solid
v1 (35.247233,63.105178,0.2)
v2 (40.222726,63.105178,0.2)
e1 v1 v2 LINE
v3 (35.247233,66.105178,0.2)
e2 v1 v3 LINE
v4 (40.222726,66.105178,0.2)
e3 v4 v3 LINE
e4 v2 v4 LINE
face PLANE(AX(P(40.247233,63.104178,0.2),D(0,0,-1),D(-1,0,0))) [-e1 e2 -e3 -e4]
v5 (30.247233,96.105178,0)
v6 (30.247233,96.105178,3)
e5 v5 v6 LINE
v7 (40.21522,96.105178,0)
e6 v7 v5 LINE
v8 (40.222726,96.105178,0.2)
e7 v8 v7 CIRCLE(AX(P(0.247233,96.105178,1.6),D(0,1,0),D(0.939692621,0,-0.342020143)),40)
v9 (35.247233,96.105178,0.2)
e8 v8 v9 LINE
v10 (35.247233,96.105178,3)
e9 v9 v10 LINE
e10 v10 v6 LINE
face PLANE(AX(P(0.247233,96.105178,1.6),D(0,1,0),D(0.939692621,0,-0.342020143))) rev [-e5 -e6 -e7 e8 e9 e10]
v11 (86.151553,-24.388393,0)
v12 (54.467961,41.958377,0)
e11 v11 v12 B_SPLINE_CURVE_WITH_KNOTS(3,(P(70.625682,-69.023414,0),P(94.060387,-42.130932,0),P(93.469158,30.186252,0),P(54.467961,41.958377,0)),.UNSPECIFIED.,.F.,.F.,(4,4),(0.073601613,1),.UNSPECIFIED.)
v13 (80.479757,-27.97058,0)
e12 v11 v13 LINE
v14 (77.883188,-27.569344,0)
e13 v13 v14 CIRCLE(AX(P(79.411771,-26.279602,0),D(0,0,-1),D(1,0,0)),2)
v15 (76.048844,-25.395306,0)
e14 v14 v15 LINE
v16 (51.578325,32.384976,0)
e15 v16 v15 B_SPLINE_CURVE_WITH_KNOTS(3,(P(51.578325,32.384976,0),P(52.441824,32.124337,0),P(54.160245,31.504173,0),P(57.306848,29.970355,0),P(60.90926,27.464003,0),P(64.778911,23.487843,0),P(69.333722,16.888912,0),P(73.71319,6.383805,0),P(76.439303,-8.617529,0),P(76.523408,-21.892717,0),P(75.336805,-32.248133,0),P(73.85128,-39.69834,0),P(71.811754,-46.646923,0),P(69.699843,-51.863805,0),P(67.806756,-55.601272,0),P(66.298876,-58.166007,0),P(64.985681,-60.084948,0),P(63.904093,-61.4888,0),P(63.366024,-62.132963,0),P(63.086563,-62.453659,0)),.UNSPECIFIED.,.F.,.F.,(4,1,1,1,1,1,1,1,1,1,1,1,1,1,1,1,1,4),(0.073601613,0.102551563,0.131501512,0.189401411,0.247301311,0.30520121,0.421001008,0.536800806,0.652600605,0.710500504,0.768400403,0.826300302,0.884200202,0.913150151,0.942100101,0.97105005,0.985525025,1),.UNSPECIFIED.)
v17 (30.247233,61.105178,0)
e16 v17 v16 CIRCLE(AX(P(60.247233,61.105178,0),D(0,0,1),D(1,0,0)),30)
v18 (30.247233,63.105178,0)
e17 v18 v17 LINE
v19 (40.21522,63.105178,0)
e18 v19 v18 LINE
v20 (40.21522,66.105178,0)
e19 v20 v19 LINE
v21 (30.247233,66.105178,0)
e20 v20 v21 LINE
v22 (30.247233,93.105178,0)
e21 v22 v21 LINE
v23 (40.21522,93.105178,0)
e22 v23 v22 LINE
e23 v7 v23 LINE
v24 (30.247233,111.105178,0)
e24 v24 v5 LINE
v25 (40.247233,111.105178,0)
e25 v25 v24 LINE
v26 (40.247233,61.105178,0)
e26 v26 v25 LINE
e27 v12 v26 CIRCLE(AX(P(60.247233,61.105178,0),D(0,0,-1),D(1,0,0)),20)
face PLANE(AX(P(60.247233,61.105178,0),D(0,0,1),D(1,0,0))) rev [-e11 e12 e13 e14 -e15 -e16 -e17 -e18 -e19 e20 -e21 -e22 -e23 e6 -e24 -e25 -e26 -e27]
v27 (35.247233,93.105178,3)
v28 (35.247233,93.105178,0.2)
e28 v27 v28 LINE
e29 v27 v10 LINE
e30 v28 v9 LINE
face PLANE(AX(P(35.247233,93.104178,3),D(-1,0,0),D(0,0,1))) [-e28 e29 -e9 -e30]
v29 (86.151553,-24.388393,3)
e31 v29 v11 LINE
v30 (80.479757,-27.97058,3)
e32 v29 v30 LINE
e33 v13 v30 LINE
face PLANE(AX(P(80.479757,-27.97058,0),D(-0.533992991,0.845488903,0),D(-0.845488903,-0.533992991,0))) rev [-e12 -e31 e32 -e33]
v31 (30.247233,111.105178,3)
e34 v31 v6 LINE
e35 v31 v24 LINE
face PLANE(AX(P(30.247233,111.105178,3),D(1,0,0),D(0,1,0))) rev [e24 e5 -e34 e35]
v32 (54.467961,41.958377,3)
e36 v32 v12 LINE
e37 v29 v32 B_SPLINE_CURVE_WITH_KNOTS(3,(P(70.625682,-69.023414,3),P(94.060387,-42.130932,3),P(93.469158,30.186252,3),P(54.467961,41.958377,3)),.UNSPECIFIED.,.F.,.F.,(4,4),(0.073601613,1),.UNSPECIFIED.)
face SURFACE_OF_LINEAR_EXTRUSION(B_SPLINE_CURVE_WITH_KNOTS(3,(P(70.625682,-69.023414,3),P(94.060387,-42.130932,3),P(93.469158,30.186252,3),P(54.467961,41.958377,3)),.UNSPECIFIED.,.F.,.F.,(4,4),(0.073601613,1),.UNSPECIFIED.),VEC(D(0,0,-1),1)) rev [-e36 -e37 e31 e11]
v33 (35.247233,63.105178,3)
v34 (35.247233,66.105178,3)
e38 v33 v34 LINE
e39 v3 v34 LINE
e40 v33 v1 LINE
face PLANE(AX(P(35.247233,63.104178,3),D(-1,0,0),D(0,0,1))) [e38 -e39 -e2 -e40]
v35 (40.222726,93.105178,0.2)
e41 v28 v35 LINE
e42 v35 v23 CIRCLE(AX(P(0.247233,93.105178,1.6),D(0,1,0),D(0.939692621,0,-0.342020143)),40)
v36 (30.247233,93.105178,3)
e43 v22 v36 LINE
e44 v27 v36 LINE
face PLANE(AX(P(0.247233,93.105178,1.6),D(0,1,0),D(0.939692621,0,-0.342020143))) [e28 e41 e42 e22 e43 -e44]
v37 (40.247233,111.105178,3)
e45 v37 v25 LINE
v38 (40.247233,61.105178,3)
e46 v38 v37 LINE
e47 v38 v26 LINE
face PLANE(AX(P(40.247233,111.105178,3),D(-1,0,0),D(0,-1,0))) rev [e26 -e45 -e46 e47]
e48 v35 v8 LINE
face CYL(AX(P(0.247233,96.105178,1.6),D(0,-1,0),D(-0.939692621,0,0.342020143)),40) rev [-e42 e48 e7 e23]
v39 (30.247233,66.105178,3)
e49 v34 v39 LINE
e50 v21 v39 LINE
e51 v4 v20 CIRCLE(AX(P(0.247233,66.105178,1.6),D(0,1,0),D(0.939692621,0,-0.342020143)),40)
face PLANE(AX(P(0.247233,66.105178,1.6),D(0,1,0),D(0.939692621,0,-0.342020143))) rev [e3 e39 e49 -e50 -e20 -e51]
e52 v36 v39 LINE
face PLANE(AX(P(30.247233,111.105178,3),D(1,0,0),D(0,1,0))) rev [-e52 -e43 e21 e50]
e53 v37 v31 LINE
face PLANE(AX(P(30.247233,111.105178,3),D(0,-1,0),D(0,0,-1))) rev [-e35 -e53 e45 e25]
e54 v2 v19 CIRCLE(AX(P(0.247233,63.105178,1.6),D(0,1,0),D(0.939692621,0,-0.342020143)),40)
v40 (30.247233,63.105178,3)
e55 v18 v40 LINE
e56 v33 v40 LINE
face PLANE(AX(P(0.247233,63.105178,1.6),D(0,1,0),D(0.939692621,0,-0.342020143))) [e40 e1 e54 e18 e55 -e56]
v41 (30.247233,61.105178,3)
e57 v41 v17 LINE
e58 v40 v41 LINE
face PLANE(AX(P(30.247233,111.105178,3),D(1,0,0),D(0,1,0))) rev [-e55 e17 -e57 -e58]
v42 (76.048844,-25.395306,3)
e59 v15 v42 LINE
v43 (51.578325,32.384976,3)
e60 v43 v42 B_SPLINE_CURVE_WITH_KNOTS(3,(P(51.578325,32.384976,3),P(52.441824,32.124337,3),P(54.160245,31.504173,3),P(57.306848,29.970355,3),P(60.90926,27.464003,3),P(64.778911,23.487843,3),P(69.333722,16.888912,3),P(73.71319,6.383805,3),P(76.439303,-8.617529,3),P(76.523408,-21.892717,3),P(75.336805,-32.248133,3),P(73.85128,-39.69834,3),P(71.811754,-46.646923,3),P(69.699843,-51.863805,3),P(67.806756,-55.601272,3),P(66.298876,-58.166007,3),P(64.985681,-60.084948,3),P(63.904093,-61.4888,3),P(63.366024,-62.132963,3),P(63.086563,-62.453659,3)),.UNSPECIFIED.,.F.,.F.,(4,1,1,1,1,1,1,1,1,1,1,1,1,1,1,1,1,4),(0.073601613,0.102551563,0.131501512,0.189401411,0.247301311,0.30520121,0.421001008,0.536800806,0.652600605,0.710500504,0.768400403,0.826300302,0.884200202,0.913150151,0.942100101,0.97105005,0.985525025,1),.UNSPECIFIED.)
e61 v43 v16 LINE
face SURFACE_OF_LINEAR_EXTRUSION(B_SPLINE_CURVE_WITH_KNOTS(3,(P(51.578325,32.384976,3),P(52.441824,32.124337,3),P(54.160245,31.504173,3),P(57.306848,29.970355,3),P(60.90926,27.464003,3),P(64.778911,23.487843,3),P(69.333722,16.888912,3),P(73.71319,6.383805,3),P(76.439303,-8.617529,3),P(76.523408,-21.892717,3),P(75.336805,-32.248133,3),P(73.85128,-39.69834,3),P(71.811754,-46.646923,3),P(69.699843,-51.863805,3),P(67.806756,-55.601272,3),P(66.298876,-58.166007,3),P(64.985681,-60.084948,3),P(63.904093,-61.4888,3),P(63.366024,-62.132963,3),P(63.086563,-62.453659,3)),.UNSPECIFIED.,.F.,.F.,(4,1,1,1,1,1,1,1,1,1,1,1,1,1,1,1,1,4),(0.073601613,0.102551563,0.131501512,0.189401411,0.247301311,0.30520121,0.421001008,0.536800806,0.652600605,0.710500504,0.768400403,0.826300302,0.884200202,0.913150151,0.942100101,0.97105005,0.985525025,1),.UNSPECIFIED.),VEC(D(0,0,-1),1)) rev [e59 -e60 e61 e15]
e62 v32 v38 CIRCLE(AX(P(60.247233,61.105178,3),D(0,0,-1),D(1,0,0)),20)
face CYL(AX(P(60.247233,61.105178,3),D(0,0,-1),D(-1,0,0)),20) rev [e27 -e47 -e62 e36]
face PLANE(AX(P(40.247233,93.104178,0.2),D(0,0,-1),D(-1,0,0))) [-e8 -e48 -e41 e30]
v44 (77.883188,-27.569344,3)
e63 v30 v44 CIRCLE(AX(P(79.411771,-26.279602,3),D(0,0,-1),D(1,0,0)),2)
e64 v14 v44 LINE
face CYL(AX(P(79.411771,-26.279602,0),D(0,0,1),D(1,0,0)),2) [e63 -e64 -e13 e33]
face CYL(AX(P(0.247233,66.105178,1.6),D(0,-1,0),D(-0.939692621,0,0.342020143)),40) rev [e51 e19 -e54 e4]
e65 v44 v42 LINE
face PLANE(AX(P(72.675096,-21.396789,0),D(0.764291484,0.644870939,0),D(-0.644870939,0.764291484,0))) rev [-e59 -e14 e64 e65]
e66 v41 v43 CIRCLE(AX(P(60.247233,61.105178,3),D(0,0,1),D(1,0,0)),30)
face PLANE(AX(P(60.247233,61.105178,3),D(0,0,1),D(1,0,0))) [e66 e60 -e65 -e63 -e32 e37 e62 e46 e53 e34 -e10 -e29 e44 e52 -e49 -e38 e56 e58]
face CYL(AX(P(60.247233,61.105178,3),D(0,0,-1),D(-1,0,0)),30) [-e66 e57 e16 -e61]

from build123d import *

# Parameters (mm, degrees)
BOSS_EXTRU_2_DEPTH      = 3
ENL_V_MAT_EXTRU_1_DEPTH = 141.768934672
EMPREINTE1_START        = 63.105178129
EMPREINTE1_DEPTH        = 3
EMPREINTE1_START_2      = 93.105178129
EMPREINTE1_2_DEPTH      = 3


# Read off the part's stored shape, not the designer's step: Empreinte1
with BuildPart() as part:
    # Esquisse1 → Boss.-Extru.2 (new body)
    with BuildSketch(Plane.XY):
        with BuildLine():
            Line((40.247233076, 111.105178129), (40.247233076, 61.105178129))
            ThreePointArc((40.247233076, 61.105178129), (44.191308202, 49.180108885), (54.467960723, 41.95837654))
            add(Edge.make_bspline(
                [(54.467960723, 41.95837654), (93.469157599, 30.186251687), (94.060386504, -42.130931626), (70.625681641, -69.023414216)],
                knots=[0.073601613, 0.073601613, 0.073601613, 0.073601613, 1, 1, 1, 1], degree=3))
            Line((70.625681641, -69.023414216), (63.086562616, -62.453658944))
            add(Edge.make_bspline(
                [(51.578324546, 32.384975746), (52.441823747, 32.124337068), (54.160244695, 31.504173294), (57.306848095, 29.97035453), (60.909260152, 27.464002891), (64.778911343, 23.487842732), (69.333722485, 16.888912111), (73.713189985, 6.383804922), (76.439302823, -8.617528818), (76.523407917, -21.892716717), (75.336804817, -32.248132674), (73.851279993, -39.698340102), (71.811754469, -46.646923176), (69.699842941, -51.863805262), (67.806756273, -55.601272185), (66.298875889, -58.166006571), (64.985680603, -60.08494816), (63.904092742, -61.488799964), (63.366023798, -62.13296342), (63.086562616, -62.453658944)],
                knots=[0.073601613, 0.073601613, 0.073601613, 0.073601613, 0.102551563, 0.131501512, 0.189401411, 0.247301311, 0.30520121, 0.421001008, 0.536800806, 0.652600605, 0.710500504, 0.768400403, 0.826300302, 0.884200202, 0.913150151, 0.942100101, 0.97105005, 0.985525025, 1, 1, 1, 1], degree=3))
            ThreePointArc((51.578324546, 32.384975746), (36.163345766, 43.217574263), (30.247233076, 61.105178129))
            Line((30.247233076, 61.105178129), (30.247233076, 111.105178129))
            Line((30.247233076, 111.105178129), (40.247233076, 111.105178129))
        make_face()
    extrude(amount=BOSS_EXTRU_2_DEPTH)

    # Esquisse2 → Enlèv. mat.-Extru.1 (cut, through all)
    with BuildSketch(Plane.XY.offset(3)):
        with BuildLine():
            Line((58.604840791, -65.718091867), (72.675095618, -21.396789164))
            Line((72.675095618, -21.396789164), (77.883188433, -27.569343611))
            ThreePointArc((77.883188433, -27.569343611), (79.106345528, -28.256142913), (80.479757382, -27.970579539))
            Line((80.479757382, -27.970579539), (87.91787168, -23.272823141))
            Line((87.91787168, -23.272823141), (76.157367596, -75.355055511))
            Line((76.157367596, -75.355055511), (58.604840791, -65.718091867))
        make_face()
    extrude(amount=-ENL_V_MAT_EXTRU_1_DEPTH, mode=Mode.SUBTRACT)

    # Empreinte1 outline → Empreinte1 (cut)
    with BuildSketch(Plane(origin=(0, 0, 0), x_dir=(1, 0, 0), z_dir=(0, 1, 0)).offset(EMPREINTE1_START)):
        with BuildLine():
            ThreePointArc((40.222725568, -0.2), (40.219098005, -0.099995306), (40.215220265, 0))
            Line((40.215220265, 0), (30.247233076, 0))
            Line((30.247233076, 0), (30.247233076, -3))
            Line((30.247233076, -3), (35.247233076, -3))
            Line((35.247233076, -3), (35.247233076, -0.2))
            Line((35.247233076, -0.2), (40.222725568, -0.2))
        make_face()
    extrude(amount=EMPREINTE1_DEPTH, mode=Mode.SUBTRACT)

    # Empreinte1 2 outline → Empreinte1 2 (cut)
    with BuildSketch(Plane(origin=(0, 0, 0), x_dir=(1, 0, 0), z_dir=(0, 1, 0)).offset(EMPREINTE1_START_2)):
        with BuildLine():
            ThreePointArc((40.222725568, -0.2), (40.219098005, -0.099995306), (40.215220265, 0))
            Line((40.215220265, 0), (30.247233076, 0))
            Line((30.247233076, 0), (30.247233076, -3))
            Line((30.247233076, -3), (35.247233076, -3))
            Line((35.247233076, -3), (35.247233076, -0.2))
            Line((35.247233076, -0.2), (40.222725568, -0.2))
        make_face()
    extrude(amount=EMPREINTE1_2_DEPTH, mode=Mode.SUBTRACT)


solid = part.part
